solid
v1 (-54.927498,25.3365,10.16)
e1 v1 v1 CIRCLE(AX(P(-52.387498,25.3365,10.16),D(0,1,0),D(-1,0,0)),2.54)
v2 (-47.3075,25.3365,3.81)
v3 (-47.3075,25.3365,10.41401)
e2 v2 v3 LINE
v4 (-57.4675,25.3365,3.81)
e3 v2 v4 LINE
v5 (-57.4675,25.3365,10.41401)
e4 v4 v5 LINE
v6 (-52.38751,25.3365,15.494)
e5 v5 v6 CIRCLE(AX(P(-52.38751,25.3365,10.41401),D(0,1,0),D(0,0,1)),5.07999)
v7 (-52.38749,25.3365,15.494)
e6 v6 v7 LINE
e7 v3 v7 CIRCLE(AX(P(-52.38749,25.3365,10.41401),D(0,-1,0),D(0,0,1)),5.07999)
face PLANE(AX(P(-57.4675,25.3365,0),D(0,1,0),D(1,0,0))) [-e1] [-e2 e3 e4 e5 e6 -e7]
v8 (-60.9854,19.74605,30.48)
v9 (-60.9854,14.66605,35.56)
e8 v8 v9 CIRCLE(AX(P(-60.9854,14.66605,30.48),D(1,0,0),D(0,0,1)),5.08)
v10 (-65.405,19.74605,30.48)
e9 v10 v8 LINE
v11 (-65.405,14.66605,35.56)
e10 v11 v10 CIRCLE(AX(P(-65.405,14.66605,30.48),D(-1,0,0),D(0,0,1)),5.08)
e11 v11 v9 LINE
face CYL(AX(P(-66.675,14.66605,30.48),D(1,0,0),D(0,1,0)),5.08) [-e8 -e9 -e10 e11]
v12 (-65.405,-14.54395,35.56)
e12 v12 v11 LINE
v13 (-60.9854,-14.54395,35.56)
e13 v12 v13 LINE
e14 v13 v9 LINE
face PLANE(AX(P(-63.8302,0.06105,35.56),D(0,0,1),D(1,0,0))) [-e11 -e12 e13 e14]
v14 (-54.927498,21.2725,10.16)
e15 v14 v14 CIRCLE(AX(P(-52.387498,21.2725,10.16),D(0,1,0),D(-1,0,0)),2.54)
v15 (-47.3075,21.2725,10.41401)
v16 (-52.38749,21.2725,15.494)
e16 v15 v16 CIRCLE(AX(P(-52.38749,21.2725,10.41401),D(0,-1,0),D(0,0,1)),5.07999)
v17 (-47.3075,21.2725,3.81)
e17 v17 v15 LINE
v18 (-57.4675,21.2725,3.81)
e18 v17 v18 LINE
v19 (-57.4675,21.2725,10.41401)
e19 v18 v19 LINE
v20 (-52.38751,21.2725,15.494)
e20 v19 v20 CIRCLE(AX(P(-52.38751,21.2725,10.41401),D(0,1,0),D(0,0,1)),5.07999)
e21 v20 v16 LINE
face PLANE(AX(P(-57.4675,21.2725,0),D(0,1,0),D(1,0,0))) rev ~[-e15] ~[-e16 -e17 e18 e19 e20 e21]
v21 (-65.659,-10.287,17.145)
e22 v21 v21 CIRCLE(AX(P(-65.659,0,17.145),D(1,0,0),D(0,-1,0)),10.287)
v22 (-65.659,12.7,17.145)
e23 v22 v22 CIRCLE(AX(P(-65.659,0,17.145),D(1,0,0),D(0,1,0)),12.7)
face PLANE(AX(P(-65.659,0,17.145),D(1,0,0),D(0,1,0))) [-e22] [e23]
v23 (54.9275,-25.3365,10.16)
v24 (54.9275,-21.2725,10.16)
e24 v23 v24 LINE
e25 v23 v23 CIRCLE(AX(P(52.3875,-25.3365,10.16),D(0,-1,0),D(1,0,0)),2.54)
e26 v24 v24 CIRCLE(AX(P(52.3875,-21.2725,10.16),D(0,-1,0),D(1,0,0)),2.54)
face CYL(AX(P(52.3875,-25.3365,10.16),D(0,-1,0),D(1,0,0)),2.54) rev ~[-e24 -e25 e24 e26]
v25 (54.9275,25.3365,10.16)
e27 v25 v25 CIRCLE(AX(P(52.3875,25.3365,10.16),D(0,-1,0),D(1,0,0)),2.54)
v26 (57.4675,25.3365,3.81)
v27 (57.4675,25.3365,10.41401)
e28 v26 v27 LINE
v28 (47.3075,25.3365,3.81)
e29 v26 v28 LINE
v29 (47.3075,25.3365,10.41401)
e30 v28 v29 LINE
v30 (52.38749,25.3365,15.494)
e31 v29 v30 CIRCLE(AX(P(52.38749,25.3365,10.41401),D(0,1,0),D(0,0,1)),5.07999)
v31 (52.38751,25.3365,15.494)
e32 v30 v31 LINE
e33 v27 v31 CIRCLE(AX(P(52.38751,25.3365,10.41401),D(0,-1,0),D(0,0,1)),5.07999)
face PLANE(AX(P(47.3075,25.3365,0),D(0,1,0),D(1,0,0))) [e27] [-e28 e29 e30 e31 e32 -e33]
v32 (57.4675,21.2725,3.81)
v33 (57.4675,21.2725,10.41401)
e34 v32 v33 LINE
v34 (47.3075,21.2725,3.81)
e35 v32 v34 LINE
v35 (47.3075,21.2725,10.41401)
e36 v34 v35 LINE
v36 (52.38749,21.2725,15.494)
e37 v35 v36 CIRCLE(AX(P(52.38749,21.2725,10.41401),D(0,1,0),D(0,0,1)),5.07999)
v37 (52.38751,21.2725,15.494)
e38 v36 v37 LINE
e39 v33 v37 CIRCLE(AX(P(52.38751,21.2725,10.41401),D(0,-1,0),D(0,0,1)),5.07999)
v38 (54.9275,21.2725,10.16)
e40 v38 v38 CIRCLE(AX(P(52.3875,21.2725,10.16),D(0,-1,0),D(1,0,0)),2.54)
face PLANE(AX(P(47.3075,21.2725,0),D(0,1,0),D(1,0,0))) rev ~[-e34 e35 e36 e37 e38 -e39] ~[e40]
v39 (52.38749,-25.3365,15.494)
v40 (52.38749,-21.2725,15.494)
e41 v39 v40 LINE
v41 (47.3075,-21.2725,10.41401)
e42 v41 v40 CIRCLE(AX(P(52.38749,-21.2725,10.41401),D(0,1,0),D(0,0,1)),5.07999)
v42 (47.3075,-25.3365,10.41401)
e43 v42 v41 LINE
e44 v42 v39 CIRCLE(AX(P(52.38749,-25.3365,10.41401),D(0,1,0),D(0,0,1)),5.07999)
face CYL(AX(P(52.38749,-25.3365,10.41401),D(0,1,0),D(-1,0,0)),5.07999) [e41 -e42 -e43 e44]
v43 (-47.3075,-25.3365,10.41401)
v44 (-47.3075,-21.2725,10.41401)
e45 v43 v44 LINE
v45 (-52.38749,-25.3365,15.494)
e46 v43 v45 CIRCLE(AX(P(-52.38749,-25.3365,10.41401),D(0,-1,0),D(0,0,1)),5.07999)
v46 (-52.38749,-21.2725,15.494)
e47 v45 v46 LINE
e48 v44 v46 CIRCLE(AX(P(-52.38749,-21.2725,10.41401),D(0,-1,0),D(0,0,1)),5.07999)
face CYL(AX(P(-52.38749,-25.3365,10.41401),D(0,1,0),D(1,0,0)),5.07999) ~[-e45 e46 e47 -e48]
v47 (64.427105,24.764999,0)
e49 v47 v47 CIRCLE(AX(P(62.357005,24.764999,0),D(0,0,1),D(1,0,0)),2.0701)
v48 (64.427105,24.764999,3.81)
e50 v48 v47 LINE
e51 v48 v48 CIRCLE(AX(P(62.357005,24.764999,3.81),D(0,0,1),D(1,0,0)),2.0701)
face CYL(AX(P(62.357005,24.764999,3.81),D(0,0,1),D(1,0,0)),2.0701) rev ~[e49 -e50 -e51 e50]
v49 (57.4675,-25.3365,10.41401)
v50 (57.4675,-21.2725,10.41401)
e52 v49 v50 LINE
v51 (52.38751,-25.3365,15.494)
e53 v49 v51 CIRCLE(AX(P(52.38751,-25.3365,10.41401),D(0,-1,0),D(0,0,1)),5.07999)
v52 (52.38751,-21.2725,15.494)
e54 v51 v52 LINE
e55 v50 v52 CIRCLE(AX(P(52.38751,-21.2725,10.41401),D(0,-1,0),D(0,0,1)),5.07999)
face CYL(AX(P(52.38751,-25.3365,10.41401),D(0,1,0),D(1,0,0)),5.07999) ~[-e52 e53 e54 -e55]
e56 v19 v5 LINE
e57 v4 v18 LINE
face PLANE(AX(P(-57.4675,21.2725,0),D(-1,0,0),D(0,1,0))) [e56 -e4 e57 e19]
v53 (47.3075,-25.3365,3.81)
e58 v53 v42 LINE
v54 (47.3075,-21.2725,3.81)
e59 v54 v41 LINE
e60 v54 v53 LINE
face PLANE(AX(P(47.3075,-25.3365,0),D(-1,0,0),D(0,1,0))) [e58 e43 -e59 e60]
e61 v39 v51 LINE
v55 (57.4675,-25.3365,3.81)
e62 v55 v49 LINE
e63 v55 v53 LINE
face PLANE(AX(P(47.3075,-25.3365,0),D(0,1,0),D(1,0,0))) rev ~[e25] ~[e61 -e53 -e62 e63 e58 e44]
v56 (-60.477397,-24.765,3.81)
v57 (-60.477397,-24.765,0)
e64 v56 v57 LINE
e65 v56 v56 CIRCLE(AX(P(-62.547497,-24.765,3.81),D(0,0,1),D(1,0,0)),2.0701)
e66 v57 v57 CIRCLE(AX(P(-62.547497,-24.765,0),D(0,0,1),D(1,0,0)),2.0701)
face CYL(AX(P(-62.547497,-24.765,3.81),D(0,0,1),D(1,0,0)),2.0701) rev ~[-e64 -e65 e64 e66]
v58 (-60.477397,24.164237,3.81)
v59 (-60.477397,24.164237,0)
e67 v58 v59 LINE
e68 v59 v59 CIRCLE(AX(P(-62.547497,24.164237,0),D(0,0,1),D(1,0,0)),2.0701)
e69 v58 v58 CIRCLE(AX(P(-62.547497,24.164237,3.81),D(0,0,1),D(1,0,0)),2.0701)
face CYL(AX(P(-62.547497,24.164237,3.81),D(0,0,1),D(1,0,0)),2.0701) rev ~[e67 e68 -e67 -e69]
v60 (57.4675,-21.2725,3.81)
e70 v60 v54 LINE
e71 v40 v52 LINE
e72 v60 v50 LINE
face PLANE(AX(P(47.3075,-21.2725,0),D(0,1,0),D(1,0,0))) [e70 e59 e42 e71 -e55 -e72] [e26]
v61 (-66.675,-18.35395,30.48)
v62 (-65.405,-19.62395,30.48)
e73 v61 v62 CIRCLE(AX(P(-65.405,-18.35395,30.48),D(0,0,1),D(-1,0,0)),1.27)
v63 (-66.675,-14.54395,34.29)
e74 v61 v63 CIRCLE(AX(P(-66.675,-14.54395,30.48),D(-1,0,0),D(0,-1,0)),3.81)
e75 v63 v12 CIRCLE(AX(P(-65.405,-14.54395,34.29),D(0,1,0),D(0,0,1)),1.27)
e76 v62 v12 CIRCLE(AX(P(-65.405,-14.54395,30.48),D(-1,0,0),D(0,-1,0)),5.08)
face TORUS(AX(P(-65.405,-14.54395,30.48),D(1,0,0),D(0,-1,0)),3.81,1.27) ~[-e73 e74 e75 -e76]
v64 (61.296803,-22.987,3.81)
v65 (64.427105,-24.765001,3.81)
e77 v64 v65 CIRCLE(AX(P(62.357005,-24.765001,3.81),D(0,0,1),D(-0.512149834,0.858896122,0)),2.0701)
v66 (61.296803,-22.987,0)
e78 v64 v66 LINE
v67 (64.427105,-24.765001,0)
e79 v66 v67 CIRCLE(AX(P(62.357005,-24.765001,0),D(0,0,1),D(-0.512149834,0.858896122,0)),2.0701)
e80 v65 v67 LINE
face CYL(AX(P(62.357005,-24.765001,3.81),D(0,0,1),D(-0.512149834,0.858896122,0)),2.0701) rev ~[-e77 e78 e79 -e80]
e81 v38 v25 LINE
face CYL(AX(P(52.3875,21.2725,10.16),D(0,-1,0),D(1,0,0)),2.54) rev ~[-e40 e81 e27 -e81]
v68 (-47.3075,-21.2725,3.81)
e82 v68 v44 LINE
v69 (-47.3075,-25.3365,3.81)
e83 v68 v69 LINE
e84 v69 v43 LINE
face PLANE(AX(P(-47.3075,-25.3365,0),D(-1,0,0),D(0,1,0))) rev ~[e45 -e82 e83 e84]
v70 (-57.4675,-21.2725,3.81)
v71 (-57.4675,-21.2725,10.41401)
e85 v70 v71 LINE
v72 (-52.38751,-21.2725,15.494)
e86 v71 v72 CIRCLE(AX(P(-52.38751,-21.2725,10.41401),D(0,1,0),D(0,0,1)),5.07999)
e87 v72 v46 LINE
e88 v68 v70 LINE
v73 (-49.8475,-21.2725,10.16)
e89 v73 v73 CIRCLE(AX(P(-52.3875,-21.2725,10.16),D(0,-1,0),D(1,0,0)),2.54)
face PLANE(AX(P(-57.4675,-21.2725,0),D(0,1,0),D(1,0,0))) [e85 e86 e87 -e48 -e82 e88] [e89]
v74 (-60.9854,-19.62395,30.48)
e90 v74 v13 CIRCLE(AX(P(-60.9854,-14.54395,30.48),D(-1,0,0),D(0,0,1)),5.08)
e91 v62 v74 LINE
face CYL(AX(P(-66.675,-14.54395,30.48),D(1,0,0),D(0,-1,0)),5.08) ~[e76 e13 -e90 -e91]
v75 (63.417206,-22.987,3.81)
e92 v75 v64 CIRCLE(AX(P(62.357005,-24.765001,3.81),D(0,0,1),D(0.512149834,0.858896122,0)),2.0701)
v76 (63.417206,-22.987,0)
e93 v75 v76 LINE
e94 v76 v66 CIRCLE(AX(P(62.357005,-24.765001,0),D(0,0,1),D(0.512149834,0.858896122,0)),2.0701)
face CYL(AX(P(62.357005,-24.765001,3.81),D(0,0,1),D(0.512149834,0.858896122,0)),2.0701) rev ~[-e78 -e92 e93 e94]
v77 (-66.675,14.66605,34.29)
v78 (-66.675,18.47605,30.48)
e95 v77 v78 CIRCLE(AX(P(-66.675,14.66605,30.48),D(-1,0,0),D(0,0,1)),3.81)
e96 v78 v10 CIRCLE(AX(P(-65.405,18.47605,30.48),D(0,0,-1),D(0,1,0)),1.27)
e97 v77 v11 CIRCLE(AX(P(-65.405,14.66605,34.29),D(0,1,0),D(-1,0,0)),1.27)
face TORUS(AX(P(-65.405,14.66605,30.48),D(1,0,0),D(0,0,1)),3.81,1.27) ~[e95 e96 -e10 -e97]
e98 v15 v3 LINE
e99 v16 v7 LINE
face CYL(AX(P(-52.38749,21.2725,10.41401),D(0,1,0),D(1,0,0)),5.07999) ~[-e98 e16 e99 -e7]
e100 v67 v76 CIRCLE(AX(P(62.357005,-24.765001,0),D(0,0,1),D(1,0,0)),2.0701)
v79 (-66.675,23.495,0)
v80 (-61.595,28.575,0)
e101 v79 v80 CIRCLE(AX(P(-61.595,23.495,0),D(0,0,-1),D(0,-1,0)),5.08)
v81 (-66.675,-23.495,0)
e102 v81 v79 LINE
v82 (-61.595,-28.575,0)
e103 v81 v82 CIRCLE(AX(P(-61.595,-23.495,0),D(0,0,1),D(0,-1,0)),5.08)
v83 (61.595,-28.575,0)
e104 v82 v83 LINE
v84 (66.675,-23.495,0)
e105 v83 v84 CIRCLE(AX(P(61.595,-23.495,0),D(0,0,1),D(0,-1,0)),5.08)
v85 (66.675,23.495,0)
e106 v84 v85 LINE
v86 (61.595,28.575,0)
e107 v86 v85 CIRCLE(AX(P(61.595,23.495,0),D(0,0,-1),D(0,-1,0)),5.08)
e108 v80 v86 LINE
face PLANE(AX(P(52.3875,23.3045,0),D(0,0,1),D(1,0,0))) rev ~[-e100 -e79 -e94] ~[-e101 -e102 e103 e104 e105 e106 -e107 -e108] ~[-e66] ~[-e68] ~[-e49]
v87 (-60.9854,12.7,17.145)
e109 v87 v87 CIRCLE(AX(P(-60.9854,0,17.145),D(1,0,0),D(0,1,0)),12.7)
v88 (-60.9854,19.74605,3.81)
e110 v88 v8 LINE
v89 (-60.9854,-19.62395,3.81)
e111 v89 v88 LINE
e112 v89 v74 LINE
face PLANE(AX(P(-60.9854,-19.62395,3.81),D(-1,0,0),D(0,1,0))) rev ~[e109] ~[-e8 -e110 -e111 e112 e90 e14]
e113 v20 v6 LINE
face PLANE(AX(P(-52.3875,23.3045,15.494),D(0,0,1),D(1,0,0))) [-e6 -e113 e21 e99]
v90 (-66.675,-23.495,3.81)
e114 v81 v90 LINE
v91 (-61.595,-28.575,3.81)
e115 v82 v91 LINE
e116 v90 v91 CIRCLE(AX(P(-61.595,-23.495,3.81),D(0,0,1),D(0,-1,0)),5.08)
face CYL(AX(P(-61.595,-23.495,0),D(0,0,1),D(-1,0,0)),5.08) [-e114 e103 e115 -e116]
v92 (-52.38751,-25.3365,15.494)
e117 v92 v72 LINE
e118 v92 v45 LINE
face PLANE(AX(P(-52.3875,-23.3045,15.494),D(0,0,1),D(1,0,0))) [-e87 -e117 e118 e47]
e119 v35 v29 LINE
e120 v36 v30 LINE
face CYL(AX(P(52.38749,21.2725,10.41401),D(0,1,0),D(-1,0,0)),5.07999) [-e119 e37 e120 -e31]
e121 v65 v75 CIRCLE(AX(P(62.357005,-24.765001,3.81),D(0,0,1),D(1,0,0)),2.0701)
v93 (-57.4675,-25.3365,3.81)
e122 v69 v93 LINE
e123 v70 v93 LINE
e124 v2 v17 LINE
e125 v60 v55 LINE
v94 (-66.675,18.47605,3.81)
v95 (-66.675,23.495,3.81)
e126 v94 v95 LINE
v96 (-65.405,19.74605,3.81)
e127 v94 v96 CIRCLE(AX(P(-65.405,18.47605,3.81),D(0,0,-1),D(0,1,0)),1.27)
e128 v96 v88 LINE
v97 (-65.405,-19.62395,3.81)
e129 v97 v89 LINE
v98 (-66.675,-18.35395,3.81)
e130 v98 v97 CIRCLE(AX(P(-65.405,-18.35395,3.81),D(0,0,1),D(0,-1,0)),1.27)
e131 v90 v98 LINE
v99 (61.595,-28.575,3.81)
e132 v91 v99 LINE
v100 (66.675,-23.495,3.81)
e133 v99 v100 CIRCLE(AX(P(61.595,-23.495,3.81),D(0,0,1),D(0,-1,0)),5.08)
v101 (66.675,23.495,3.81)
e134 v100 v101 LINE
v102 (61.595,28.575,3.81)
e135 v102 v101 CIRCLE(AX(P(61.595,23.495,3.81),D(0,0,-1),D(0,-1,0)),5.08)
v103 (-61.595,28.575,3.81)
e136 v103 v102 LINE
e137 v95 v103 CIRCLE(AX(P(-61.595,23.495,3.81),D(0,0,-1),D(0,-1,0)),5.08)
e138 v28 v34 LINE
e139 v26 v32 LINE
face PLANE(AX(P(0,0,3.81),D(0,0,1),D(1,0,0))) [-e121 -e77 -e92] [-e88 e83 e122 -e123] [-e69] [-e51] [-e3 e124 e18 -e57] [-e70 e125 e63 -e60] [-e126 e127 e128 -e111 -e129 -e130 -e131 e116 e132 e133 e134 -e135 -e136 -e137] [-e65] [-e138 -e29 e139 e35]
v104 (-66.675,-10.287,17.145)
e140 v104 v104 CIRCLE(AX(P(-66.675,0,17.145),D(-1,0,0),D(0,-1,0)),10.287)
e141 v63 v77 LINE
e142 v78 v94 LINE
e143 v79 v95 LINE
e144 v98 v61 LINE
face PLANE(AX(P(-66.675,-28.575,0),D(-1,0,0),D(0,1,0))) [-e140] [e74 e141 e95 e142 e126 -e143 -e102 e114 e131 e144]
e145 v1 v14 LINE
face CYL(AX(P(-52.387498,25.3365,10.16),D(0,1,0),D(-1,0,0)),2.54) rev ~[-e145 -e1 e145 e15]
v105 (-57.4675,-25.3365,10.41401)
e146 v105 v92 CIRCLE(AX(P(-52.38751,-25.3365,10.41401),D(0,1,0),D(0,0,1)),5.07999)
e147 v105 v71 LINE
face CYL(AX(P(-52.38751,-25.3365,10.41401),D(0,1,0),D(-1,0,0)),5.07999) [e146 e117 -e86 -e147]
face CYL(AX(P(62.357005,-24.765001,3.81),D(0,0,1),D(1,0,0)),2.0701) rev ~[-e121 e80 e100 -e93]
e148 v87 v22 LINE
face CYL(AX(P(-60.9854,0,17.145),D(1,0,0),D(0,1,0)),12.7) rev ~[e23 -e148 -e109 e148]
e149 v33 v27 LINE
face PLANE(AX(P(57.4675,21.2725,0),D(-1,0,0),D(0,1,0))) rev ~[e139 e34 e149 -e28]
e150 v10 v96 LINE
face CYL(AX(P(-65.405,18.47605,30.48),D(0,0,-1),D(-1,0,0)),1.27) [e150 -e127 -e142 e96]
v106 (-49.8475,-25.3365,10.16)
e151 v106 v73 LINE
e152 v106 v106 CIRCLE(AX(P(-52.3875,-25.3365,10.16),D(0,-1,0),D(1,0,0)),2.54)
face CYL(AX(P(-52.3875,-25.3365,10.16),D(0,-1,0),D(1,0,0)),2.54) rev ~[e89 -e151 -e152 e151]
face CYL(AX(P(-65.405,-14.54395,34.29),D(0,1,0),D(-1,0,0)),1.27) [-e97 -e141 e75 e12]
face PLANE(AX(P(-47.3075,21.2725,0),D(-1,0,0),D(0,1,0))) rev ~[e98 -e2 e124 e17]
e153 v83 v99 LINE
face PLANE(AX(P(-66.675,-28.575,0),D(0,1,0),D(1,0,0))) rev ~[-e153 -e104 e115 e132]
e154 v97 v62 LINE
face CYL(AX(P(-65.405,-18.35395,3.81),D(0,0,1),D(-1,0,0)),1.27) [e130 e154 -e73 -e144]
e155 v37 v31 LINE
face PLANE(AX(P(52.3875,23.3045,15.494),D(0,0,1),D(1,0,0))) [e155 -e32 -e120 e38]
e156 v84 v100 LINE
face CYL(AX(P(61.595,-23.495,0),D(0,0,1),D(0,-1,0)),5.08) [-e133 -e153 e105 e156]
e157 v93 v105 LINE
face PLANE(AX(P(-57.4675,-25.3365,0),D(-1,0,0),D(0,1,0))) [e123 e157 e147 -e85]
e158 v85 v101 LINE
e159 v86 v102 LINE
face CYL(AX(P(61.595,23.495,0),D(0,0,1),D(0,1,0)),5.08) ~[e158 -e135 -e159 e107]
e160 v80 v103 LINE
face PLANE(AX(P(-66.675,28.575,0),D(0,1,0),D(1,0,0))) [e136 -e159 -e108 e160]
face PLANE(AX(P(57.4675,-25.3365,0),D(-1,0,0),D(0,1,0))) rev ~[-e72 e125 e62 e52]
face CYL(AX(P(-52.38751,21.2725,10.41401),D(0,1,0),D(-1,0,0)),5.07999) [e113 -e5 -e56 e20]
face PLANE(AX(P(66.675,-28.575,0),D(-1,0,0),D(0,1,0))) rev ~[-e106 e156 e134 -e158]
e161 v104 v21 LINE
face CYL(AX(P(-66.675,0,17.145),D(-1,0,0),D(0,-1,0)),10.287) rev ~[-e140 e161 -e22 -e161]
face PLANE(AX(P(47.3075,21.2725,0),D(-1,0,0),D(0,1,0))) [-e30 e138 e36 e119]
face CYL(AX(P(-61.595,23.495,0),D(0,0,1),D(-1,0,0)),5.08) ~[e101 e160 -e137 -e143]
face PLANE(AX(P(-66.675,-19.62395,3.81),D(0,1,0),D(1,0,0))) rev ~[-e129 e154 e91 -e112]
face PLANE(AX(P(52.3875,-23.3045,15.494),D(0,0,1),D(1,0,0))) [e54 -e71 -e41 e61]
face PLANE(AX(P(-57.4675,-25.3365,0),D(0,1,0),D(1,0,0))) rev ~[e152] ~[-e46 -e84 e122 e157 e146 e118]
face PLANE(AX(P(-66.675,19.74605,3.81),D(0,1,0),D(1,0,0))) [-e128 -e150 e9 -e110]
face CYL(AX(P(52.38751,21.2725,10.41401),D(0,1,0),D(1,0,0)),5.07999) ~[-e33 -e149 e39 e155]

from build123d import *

# Parameters (mm, degrees)
F0_W      = 133.35
F0_H      = 57.15
F0_W_2    = 94.615
F0_H_2    = 4.064
F0_W_3    = 10.16
F0_H_3    = 42.545
F1_DEPTH  = 3.81
F2_W      = 5.6896
F2_H      = 39.37
F3_DEPTH  = 31.75
F4_R      = 5.08
F5_R      = 10.287
F6_DEPTH  = 25.4
F7_R      = 2.0701
F8_DEPTH  = 3.811
F9_R      = 5.08
F10_R     = 1.27
F11_R     = 12.7
F11_R_2   = 10.287
F12_DEPTH = 4.6736
F13_DEPTH = 15.494
F14_R     = 2.54
F15_DEPTH = 5.08
F16_R     = 2.54
F17_DEPTH = 25.4
F18_R     = 2.54
F19_DEPTH = 25.4
F20_R     = 2.54
F21_DEPTH = 25.4
F22_R     = 5.07999


# Not quite as in the source:
# - a fillet or chamfer is up to 0.001 mm smaller than in the source, because OpenCascade refuses the exact size


with BuildPart() as f1:
    # F0 (on Top) → F1 (new body)
    with BuildSketch(Plane.XY):
        Rectangle(F0_W, F0_H)
        Polygon((57.4675, -21.2725), (57.4675, -25.3365), (47.3075, -25.3365), (-47.3075, -25.3365), (-57.4675, -25.3365), (-57.4675, -21.2725), (-57.4675, 21.2725), (-57.4675, 25.3365), (-47.3075, 25.3365), (47.3075, 25.3365), (57.4675, 25.3365), (57.4675, 21.2725), align=None, mode=Mode.SUBTRACT)
        with Locations((0, 23.3045)):
            Rectangle(F0_W_2, F0_H_2)
        with Locations((-52.3875, 0)):
            Rectangle(F0_W_3, F0_H_3)
        with Locations((-52.3875, -23.3045)):
            Rectangle(F0_W_3, F0_H_2)
        with Locations((0, -23.3045)):
            Rectangle(F0_W_2, F0_H_2)
        Rectangle(F0_W_2, F0_H_3)
        with Locations((52.3875, 0)):
            Rectangle(F0_W_3, F0_H_3)
        with Locations((52.3875, -23.3045)):
            Rectangle(F0_W_3, F0_H_2)
        with Locations((52.3875, 23.3045)):
            Rectangle(F0_W_3, F0_H_2)
        with Locations((-52.3875, 23.3045)):
            Rectangle(F0_W_3, F0_H_2)
    extrude(amount=F1_DEPTH)

    # F2 (on face) → F3 (join)
    with BuildSketch(Plane.XY.offset(3.81)):
        with Locations((-63.8302, 0.0610498762)):
            Rectangle(F2_W, F2_H)
    extrude(amount=F3_DEPTH)

    # F4
    f4_edges = [f1.edges().sort_by_distance(p)[0] for p in [
        (-63.8302, 19.74605, 35.56),
        (-63.8302, -19.62395, 35.56),
    ]]
    fillet(f4_edges, radius=F4_R)

    # F5 (on face) → F6 (cut)
    with BuildSketch(Plane(origin=(-66.675, 0, 0), x_dir=(0, -1, 0), z_dir=(-1, 0, 0))):
        with Locations((0, 17.145)):
            Circle(F5_R)
    extrude(amount=-F6_DEPTH, mode=Mode.SUBTRACT)

    # F7 (on face) → F8 (cut, through all)
    with BuildSketch(Plane.XY.offset(3.81)):
        with Locations((-62.5474974513, 24.164236586)):
            Circle(F7_R)
        with Locations((62.3570047319, 24.7649991388)):
            Circle(F7_R)
        with BuildLine():
            ThreePointArc((64.4271047319, -24.7650008612), (64.1570098525, -23.7426038856), (63.4172061032, -22.987))
            Line((63.4172061032, -22.987), (61.2968033606, -22.987))
            ThreePointArc((61.2968033606, -22.987), (61.3346077563, -26.5650059818), (64.4271047319, -24.7650008612))
        make_face()
        with BuildLine():
            Line((61.2968033606, -22.987), (63.4172061032, -22.987))
            ThreePointArc((63.4172061032, -22.987), (62.3570047319, -22.6949008612), (61.2968033606, -22.987))
        make_face()
        with Locations((-62.5474974513, -24.7649997473)):
            Circle(F7_R)
    extrude(amount=-F8_DEPTH, mode=Mode.SUBTRACT)

    # F9
    f9_edges = [f1.edges().sort_by_distance(p)[0] for p in [
        (66.675, 28.575, 1.905),
        (-66.675, 28.575, 1.905),
        (-66.675, -28.575, 1.905),
        (66.675, -28.575, 1.905),
    ]]
    fillet(f9_edges, radius=F9_R)

    # F10
    f10_edges = [f1.edges().sort_by_distance(p)[0] for p in [
        (-66.675, 0.06105, 35.56),
    ]]
    fillet(f10_edges, radius=F10_R)

    # F11 (on face) → F12 (cut)
    with BuildSketch(Plane.YZ.offset(-60.9854)):
        with Locations((0, 17.145)):
            Circle(F11_R)
        with Locations((0, 17.145)):
            Circle(F11_R_2, mode=Mode.SUBTRACT)
    extrude(amount=-F12_DEPTH, mode=Mode.SUBTRACT)

    # F0 (on Top) → F13 (join)
    with BuildSketch(Plane.XY):
        with Locations((52.3875, 23.3045)):
            Rectangle(F0_W_3, F0_H_2)
        with Locations((52.3875, -23.3045)):
            Rectangle(F0_W_3, F0_H_2)
        with Locations((-52.3875, 23.3045)):
            Rectangle(F0_W_3, F0_H_2)
        with Locations((-52.3875, -23.3045)):
            Rectangle(F0_W_3, F0_H_2)
    extrude(amount=F13_DEPTH)

    # F14 (on face) → F15 (cut)
    with BuildSketch(Plane(origin=(0, 25.3365, 0), x_dir=(-1, 0, 0), z_dir=(0, 1, 0))):
        with Locations((52.3874983191, 10.1600000635)):
            Circle(F14_R)
    extrude(amount=-F15_DEPTH, mode=Mode.SUBTRACT)

    # F16 (on face) → F17 (cut)
    with BuildSketch(Plane.XZ.offset(25.3365)):
        with Locations((52.3875, 10.16)):
            Circle(F16_R)
    extrude(amount=-F17_DEPTH, mode=Mode.SUBTRACT)

    # F18 (on face) → F19 (cut)
    with BuildSketch(Plane.XZ.offset(-21.2725)):
        with Locations((52.3875, 10.16)):
            Circle(F18_R)
    extrude(amount=-F19_DEPTH, mode=Mode.SUBTRACT)

    # F20 (on face) → F21 (cut)
    with BuildSketch(Plane.XZ.offset(25.3365)):
        with Locations((-52.3875, 10.16)):
            Circle(F20_R)
    extrude(amount=-F21_DEPTH, mode=Mode.SUBTRACT)

    # F22 (radius 5.08 in the source; OpenCascade refuses exactly that, so slightly less here)
    f22_edges = [f1.edges().sort_by_distance(p)[0] for p in [
        (-47.3075, -23.3045, 15.494),
        (-57.4675, -23.3045, 15.494),
        (-57.4675, 23.3045, 15.494),
        (-47.3075, 23.3045, 15.494),
        (47.3075, 23.3045, 15.494),
        (47.3075, -23.3045, 15.494),
        (57.4675, -23.3045, 15.494),
        (57.4675, 23.3045, 15.494),
    ]]
    fillet(f22_edges, radius=F22_R)


solid = f1.part
